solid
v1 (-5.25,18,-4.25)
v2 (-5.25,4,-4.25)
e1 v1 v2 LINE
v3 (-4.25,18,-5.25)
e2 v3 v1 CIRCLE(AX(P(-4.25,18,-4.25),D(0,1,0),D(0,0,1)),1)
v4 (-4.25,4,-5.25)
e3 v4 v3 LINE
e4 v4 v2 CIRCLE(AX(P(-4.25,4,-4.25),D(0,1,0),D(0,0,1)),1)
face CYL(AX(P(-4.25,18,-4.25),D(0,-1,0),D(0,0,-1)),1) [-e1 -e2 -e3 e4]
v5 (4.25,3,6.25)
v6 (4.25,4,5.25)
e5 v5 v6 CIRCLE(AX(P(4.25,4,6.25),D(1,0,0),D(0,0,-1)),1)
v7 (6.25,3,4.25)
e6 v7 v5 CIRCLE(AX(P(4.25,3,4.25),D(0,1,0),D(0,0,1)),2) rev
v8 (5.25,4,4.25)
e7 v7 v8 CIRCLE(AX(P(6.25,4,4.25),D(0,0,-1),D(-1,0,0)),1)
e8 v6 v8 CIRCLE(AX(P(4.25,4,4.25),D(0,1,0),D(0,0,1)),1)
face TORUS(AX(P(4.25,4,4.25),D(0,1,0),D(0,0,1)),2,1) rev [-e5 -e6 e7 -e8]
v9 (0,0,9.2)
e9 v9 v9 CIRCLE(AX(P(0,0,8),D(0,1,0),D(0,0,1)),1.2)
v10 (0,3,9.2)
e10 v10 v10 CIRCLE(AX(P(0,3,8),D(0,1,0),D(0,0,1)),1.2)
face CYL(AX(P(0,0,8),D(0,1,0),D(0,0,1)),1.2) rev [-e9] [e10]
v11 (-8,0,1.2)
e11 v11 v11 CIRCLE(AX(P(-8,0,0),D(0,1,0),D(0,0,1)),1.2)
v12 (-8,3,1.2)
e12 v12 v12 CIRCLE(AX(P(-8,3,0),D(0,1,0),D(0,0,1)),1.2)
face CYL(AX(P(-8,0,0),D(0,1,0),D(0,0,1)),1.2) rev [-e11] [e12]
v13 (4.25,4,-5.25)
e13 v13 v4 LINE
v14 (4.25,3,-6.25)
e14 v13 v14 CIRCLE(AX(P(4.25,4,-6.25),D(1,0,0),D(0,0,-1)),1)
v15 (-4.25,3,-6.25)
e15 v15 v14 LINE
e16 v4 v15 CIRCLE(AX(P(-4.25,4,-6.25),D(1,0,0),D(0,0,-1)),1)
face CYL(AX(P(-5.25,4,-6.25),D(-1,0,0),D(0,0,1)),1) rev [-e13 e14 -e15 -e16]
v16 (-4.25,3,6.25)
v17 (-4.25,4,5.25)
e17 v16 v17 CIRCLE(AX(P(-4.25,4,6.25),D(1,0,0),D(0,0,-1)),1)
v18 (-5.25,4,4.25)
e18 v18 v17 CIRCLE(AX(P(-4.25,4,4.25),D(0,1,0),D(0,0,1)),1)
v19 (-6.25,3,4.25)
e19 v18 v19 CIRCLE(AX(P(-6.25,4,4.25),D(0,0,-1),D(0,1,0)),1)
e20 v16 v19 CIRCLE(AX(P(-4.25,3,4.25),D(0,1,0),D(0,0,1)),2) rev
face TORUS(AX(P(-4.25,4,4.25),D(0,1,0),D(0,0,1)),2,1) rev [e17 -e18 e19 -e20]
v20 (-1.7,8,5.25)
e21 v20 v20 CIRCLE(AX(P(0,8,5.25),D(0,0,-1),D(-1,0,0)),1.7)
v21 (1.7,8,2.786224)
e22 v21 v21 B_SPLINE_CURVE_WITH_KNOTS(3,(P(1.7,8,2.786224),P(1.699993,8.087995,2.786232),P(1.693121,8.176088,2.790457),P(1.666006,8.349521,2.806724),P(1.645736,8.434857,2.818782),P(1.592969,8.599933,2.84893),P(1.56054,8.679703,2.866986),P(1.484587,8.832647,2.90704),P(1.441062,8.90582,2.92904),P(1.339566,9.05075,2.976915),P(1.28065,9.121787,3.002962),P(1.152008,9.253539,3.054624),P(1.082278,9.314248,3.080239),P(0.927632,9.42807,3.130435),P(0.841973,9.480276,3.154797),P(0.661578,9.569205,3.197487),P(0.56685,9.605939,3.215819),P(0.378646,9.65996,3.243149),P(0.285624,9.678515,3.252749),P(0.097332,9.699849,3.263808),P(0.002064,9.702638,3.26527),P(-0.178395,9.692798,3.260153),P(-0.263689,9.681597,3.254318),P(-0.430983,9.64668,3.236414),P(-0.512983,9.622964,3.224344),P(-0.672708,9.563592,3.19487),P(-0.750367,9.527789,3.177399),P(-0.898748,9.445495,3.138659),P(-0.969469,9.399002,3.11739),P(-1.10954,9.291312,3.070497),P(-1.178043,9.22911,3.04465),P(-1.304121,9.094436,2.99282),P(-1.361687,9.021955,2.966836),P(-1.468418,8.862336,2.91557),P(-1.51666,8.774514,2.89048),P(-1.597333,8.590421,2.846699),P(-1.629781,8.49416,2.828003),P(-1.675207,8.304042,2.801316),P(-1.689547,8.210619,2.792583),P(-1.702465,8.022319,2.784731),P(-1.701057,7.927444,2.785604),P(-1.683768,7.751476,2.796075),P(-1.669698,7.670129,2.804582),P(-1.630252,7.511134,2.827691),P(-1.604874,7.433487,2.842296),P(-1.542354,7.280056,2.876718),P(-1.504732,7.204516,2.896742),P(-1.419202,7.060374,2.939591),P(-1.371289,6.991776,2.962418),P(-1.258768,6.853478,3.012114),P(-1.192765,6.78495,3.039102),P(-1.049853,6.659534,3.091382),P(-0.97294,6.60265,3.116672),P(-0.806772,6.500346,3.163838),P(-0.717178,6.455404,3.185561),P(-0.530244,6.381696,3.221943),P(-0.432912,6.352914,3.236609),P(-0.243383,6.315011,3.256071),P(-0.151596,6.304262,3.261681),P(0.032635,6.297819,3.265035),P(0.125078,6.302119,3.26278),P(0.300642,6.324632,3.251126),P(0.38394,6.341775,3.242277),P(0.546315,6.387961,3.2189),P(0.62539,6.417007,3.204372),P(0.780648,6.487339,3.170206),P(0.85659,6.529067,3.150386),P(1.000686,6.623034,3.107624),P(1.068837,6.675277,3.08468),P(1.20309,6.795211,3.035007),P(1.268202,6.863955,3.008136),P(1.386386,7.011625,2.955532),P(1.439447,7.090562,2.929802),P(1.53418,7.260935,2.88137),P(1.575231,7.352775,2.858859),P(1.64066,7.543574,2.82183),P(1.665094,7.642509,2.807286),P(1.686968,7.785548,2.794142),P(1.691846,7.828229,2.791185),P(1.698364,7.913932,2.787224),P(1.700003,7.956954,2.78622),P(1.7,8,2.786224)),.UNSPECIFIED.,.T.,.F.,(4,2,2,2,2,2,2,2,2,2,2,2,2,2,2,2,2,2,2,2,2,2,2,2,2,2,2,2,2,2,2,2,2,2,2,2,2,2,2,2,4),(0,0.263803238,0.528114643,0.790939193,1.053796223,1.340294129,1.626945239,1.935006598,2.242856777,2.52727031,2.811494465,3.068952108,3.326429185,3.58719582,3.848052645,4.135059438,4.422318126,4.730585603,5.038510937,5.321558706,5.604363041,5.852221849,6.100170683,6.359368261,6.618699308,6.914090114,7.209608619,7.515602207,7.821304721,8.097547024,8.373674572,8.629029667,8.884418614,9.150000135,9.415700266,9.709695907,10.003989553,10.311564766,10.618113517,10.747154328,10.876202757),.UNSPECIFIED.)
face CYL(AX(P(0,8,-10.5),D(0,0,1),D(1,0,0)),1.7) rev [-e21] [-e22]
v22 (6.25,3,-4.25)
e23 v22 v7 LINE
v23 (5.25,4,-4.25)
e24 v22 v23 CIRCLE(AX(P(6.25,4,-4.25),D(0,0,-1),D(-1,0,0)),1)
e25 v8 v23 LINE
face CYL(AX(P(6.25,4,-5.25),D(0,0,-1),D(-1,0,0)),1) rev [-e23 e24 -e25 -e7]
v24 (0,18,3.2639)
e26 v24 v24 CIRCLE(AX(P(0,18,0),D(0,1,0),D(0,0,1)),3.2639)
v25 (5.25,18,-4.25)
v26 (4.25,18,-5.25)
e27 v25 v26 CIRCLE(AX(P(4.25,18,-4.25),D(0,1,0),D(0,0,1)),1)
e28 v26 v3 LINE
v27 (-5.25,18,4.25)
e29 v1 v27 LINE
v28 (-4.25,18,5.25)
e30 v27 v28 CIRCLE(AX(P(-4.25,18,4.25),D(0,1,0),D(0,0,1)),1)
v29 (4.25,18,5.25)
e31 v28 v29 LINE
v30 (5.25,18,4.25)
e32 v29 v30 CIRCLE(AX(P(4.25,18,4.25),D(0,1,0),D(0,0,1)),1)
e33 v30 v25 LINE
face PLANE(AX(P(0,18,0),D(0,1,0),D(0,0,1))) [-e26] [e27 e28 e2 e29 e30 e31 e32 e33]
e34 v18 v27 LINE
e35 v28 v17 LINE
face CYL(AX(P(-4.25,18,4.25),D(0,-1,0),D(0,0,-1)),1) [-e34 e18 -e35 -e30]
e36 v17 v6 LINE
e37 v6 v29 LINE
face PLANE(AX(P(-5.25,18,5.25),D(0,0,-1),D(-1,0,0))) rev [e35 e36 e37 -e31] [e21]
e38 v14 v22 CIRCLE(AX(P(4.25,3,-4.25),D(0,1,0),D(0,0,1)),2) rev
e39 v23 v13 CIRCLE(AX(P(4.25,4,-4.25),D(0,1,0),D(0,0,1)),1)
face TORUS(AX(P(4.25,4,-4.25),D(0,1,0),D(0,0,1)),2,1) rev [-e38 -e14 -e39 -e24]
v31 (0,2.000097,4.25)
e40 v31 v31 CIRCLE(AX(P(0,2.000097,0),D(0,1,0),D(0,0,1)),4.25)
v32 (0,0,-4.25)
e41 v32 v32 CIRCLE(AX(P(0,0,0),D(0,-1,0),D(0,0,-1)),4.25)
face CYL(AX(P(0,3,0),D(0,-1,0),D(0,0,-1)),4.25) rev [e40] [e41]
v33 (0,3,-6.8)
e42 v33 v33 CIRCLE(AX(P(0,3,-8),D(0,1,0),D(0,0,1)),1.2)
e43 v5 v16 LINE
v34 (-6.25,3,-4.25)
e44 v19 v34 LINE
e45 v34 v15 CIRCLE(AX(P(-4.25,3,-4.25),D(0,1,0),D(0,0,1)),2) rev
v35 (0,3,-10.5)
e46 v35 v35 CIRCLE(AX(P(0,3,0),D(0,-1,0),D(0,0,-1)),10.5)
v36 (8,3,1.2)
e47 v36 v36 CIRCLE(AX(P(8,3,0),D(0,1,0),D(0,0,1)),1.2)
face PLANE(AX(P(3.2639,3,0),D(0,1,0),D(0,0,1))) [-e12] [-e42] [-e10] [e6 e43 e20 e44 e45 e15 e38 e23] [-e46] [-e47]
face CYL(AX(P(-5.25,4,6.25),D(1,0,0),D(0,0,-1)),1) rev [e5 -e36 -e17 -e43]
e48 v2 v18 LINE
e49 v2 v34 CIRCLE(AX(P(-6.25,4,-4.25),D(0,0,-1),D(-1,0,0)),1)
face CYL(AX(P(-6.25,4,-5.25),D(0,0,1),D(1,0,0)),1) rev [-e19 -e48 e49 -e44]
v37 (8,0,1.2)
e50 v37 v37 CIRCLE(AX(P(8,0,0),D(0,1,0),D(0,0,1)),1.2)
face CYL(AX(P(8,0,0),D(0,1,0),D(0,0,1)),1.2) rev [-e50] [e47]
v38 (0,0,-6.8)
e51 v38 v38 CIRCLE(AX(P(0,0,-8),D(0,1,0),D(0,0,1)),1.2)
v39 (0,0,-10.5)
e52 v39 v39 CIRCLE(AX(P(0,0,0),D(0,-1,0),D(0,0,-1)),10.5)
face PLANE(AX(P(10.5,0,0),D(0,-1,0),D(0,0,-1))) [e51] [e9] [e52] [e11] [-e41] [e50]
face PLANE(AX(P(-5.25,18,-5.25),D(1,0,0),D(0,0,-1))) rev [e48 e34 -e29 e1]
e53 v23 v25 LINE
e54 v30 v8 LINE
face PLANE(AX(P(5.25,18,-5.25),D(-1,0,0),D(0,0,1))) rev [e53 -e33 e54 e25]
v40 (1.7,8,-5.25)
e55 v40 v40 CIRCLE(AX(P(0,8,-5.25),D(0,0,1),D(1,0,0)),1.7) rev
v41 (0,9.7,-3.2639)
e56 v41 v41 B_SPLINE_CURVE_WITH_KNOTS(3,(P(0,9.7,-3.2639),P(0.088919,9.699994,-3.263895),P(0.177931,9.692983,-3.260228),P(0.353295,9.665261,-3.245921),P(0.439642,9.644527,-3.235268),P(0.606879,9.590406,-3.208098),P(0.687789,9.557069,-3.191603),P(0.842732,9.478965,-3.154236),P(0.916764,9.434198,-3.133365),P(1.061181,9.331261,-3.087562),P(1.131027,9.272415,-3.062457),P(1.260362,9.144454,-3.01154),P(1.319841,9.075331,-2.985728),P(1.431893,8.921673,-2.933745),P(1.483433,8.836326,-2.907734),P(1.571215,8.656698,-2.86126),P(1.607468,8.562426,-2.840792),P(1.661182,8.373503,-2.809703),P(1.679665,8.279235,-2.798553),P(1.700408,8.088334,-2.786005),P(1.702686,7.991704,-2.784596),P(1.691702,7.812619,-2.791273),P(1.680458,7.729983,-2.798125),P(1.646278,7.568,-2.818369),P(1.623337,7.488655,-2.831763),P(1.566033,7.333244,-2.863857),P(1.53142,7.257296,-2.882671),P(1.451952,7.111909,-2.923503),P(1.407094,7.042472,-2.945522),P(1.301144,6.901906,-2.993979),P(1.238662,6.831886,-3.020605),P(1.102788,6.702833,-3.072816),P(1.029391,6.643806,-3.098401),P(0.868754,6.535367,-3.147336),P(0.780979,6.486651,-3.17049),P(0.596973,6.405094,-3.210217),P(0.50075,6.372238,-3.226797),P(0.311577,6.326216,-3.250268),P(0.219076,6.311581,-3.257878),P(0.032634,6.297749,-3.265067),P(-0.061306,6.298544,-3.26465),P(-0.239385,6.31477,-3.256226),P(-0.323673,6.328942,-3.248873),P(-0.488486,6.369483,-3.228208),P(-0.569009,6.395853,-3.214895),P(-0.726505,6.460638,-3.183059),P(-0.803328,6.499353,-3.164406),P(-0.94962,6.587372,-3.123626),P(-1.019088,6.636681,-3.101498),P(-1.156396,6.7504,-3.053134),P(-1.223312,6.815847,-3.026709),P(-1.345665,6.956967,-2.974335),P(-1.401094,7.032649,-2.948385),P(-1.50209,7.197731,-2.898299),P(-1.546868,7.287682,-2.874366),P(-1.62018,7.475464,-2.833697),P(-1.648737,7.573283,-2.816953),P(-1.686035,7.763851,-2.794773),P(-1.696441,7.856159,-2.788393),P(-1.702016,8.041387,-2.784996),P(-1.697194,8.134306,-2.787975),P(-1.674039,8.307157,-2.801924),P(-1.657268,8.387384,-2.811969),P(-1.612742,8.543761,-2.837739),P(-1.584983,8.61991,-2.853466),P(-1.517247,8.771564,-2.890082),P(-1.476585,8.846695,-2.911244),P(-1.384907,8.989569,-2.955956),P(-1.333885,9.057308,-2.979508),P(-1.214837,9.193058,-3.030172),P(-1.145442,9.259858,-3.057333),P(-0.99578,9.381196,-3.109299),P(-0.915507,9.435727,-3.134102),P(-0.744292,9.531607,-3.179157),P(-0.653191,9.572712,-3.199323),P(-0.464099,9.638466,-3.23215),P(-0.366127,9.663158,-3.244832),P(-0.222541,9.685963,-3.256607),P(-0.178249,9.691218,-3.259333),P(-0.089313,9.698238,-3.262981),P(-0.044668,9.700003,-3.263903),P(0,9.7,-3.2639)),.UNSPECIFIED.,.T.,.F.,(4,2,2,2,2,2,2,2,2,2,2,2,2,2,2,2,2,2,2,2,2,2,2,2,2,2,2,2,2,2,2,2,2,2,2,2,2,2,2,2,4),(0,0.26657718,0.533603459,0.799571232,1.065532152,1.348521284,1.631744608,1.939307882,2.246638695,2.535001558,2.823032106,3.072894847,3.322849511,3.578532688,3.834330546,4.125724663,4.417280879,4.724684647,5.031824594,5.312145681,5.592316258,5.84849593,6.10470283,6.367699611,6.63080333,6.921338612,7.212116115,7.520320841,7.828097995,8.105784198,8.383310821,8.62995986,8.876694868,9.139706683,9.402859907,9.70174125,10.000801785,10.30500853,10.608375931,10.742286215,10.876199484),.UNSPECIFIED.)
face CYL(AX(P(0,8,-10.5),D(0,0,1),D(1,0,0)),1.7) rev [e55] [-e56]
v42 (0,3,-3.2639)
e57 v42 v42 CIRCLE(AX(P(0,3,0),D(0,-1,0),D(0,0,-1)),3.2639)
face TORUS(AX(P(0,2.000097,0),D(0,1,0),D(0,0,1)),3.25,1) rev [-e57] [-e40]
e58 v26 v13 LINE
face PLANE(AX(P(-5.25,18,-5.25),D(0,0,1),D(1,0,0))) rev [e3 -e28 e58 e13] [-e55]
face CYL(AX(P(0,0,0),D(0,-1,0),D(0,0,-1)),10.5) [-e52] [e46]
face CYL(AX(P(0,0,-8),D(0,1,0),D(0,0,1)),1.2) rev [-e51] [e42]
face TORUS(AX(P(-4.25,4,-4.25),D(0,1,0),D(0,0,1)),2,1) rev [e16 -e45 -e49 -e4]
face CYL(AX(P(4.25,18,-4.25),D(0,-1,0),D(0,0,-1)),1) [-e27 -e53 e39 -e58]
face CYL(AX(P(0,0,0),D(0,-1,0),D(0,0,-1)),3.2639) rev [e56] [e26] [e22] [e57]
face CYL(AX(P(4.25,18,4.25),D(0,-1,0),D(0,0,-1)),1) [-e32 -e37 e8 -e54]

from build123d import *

# Parameters (mm, degrees)
SKETCH1_W           = 7.2361
SKETCH1_H           = 3
BOSS_EXTRUDE1_START = 15
SKETCH7_W           = 10.5
SKETCH7_H           = 10.5
SKETCH7_R           = 3.2639
BOSS_EXTRUDE1_DEPTH = 15
SKETCH3_R           = 1.7
CUT_EXTRUDE1_DEPTH  = 33.886404519
SKETCH4_R           = 1.2
CUT_EXTRUDE2_DEPTH  = 22.10687099
FILLET1_R           = 1
FILLET2_R           = 1
SKETCH8_R           = 4.25
CUT_EXTRUDE3_DEPTH  = 3
FILLET3_R           = 1


with BuildPart() as part:
    # Sketch1 → Revolve1 (revolve)
    with BuildSketch(Plane.XY, mode=Mode.PRIVATE) as revolve1_sk:
        with Locations((6.88195, 1.5)):
            Rectangle(SKETCH1_W, SKETCH1_H)
    revolve(revolve1_sk.sketch.rotate(Axis((0, 0, 0), (0, 1, 0)), 90), axis=Axis((0, 0, 0), (0, 1, 0)))

    # Sketch7 → Boss-Extrude1 (add)
    with BuildSketch(Plane(origin=(0, 3, 0), x_dir=(1, 0, 0), z_dir=(0, 1, 0)).offset(BOSS_EXTRUDE1_START)):
        Rectangle(SKETCH7_W, SKETCH7_H)
        with Locations(Location((0, 0, 0), (0, 0, 90))):
            Circle(SKETCH7_R, mode=Mode.SUBTRACT)
    extrude(amount=-BOSS_EXTRUDE1_DEPTH)

    # Sketch3 → Cut-Extrude1 (cut, through all)
    with BuildSketch(Plane(origin=(12.071067812, 0, 5.25), x_dir=(-1, 0, 0), z_dir=(0, 0, -1))):
        with Locations(Location((12.071067812, 8, 0), (0, 0, 180))):
            Circle(SKETCH3_R)
    extrude(amount=CUT_EXTRUDE1_DEPTH, mode=Mode.SUBTRACT)

    # Sketch4 → Cut-Extrude2 (cut, through all)
    with BuildSketch(Plane(origin=(0, 3, 0), x_dir=(1, 0, 0), z_dir=(0, 1, 0))):
        with Locations(Location((0, 8, 0), (0, 0, 270))):
            Circle(SKETCH4_R)
        with Locations(Location((8, 0, 0), (0, 0, 270))):
            Circle(SKETCH4_R)
        with Locations(Location((0, -8, 0), (0, 0, 270))):
            Circle(SKETCH4_R)
        with Locations(Location((-8, 0, 0), (0, 0, 270))):
            Circle(SKETCH4_R)
    extrude(amount=-CUT_EXTRUDE2_DEPTH, mode=Mode.SUBTRACT)

    # Fillet1
    fillet1_edges = [part.edges().sort_by_distance(p)[0] for p in [
        (5.25, 10.5, 5.25),
        (5.25, 10.5, -5.25),
        (-5.25, 10.5, -5.25),
        (-5.25, 10.5, 5.25),
    ]]
    fillet(fillet1_edges, radius=FILLET1_R)

    # Fillet2
    fillet2_edges = [part.edges().sort_by_distance(p)[0] for p in [
        (0, 3, -5.25),
        (5.25, 3, 0),
        (-5.25, 3, 0),
        (0, 3, 5.25),
        (4.957106781, 3, -4.957106781),
        (-4.957106781, 3, -4.957106781),
        (4.957106781, 3, 4.957106781),
        (-4.957106781, 3, 4.957106781),
    ]]
    fillet(fillet2_edges, radius=FILLET2_R)

    # Sketch8 → Cut-Extrude3 (cut)
    with BuildSketch(Plane.XZ):
        with Locations(Location((0, 0, 0), (0, 0, 270))):
            Circle(SKETCH8_R)
    extrude(amount=-CUT_EXTRUDE3_DEPTH, mode=Mode.SUBTRACT)

    # Fillet3
    # the kernel refuses this fillet: 1 mm, written as the material it adds along each edge
    with BuildSketch(Plane(origin=(0, 3, 0), x_dir=(0, 0, -1), z_dir=(-1, 0, 0))) as fillet3_piece_1_section:
        with BuildLine():
            CenterArc((4.25 - FILLET3_R, FILLET3_R), FILLET3_R, 270, 90)
            Line((4.25 - FILLET3_R, 0), (4.25, 0))
            Line((4.25, 0), (4.25, FILLET3_R))
        make_face()
    fillet3_piece_1 = revolve(axis=Axis((0, 3, 0), (0, -1, 0)), mode=Mode.PRIVATE)
    fillet3_piece_1 = fillet3_piece_1 - Plane(origin=(0, 2.715239817, 0), x_dir=(0, 0, -1), z_dir=(0, 1, 0)) * Cylinder(3.2639, 17, mode=Mode.PRIVATE)
    add(fillet3_piece_1)


solid = part.part
